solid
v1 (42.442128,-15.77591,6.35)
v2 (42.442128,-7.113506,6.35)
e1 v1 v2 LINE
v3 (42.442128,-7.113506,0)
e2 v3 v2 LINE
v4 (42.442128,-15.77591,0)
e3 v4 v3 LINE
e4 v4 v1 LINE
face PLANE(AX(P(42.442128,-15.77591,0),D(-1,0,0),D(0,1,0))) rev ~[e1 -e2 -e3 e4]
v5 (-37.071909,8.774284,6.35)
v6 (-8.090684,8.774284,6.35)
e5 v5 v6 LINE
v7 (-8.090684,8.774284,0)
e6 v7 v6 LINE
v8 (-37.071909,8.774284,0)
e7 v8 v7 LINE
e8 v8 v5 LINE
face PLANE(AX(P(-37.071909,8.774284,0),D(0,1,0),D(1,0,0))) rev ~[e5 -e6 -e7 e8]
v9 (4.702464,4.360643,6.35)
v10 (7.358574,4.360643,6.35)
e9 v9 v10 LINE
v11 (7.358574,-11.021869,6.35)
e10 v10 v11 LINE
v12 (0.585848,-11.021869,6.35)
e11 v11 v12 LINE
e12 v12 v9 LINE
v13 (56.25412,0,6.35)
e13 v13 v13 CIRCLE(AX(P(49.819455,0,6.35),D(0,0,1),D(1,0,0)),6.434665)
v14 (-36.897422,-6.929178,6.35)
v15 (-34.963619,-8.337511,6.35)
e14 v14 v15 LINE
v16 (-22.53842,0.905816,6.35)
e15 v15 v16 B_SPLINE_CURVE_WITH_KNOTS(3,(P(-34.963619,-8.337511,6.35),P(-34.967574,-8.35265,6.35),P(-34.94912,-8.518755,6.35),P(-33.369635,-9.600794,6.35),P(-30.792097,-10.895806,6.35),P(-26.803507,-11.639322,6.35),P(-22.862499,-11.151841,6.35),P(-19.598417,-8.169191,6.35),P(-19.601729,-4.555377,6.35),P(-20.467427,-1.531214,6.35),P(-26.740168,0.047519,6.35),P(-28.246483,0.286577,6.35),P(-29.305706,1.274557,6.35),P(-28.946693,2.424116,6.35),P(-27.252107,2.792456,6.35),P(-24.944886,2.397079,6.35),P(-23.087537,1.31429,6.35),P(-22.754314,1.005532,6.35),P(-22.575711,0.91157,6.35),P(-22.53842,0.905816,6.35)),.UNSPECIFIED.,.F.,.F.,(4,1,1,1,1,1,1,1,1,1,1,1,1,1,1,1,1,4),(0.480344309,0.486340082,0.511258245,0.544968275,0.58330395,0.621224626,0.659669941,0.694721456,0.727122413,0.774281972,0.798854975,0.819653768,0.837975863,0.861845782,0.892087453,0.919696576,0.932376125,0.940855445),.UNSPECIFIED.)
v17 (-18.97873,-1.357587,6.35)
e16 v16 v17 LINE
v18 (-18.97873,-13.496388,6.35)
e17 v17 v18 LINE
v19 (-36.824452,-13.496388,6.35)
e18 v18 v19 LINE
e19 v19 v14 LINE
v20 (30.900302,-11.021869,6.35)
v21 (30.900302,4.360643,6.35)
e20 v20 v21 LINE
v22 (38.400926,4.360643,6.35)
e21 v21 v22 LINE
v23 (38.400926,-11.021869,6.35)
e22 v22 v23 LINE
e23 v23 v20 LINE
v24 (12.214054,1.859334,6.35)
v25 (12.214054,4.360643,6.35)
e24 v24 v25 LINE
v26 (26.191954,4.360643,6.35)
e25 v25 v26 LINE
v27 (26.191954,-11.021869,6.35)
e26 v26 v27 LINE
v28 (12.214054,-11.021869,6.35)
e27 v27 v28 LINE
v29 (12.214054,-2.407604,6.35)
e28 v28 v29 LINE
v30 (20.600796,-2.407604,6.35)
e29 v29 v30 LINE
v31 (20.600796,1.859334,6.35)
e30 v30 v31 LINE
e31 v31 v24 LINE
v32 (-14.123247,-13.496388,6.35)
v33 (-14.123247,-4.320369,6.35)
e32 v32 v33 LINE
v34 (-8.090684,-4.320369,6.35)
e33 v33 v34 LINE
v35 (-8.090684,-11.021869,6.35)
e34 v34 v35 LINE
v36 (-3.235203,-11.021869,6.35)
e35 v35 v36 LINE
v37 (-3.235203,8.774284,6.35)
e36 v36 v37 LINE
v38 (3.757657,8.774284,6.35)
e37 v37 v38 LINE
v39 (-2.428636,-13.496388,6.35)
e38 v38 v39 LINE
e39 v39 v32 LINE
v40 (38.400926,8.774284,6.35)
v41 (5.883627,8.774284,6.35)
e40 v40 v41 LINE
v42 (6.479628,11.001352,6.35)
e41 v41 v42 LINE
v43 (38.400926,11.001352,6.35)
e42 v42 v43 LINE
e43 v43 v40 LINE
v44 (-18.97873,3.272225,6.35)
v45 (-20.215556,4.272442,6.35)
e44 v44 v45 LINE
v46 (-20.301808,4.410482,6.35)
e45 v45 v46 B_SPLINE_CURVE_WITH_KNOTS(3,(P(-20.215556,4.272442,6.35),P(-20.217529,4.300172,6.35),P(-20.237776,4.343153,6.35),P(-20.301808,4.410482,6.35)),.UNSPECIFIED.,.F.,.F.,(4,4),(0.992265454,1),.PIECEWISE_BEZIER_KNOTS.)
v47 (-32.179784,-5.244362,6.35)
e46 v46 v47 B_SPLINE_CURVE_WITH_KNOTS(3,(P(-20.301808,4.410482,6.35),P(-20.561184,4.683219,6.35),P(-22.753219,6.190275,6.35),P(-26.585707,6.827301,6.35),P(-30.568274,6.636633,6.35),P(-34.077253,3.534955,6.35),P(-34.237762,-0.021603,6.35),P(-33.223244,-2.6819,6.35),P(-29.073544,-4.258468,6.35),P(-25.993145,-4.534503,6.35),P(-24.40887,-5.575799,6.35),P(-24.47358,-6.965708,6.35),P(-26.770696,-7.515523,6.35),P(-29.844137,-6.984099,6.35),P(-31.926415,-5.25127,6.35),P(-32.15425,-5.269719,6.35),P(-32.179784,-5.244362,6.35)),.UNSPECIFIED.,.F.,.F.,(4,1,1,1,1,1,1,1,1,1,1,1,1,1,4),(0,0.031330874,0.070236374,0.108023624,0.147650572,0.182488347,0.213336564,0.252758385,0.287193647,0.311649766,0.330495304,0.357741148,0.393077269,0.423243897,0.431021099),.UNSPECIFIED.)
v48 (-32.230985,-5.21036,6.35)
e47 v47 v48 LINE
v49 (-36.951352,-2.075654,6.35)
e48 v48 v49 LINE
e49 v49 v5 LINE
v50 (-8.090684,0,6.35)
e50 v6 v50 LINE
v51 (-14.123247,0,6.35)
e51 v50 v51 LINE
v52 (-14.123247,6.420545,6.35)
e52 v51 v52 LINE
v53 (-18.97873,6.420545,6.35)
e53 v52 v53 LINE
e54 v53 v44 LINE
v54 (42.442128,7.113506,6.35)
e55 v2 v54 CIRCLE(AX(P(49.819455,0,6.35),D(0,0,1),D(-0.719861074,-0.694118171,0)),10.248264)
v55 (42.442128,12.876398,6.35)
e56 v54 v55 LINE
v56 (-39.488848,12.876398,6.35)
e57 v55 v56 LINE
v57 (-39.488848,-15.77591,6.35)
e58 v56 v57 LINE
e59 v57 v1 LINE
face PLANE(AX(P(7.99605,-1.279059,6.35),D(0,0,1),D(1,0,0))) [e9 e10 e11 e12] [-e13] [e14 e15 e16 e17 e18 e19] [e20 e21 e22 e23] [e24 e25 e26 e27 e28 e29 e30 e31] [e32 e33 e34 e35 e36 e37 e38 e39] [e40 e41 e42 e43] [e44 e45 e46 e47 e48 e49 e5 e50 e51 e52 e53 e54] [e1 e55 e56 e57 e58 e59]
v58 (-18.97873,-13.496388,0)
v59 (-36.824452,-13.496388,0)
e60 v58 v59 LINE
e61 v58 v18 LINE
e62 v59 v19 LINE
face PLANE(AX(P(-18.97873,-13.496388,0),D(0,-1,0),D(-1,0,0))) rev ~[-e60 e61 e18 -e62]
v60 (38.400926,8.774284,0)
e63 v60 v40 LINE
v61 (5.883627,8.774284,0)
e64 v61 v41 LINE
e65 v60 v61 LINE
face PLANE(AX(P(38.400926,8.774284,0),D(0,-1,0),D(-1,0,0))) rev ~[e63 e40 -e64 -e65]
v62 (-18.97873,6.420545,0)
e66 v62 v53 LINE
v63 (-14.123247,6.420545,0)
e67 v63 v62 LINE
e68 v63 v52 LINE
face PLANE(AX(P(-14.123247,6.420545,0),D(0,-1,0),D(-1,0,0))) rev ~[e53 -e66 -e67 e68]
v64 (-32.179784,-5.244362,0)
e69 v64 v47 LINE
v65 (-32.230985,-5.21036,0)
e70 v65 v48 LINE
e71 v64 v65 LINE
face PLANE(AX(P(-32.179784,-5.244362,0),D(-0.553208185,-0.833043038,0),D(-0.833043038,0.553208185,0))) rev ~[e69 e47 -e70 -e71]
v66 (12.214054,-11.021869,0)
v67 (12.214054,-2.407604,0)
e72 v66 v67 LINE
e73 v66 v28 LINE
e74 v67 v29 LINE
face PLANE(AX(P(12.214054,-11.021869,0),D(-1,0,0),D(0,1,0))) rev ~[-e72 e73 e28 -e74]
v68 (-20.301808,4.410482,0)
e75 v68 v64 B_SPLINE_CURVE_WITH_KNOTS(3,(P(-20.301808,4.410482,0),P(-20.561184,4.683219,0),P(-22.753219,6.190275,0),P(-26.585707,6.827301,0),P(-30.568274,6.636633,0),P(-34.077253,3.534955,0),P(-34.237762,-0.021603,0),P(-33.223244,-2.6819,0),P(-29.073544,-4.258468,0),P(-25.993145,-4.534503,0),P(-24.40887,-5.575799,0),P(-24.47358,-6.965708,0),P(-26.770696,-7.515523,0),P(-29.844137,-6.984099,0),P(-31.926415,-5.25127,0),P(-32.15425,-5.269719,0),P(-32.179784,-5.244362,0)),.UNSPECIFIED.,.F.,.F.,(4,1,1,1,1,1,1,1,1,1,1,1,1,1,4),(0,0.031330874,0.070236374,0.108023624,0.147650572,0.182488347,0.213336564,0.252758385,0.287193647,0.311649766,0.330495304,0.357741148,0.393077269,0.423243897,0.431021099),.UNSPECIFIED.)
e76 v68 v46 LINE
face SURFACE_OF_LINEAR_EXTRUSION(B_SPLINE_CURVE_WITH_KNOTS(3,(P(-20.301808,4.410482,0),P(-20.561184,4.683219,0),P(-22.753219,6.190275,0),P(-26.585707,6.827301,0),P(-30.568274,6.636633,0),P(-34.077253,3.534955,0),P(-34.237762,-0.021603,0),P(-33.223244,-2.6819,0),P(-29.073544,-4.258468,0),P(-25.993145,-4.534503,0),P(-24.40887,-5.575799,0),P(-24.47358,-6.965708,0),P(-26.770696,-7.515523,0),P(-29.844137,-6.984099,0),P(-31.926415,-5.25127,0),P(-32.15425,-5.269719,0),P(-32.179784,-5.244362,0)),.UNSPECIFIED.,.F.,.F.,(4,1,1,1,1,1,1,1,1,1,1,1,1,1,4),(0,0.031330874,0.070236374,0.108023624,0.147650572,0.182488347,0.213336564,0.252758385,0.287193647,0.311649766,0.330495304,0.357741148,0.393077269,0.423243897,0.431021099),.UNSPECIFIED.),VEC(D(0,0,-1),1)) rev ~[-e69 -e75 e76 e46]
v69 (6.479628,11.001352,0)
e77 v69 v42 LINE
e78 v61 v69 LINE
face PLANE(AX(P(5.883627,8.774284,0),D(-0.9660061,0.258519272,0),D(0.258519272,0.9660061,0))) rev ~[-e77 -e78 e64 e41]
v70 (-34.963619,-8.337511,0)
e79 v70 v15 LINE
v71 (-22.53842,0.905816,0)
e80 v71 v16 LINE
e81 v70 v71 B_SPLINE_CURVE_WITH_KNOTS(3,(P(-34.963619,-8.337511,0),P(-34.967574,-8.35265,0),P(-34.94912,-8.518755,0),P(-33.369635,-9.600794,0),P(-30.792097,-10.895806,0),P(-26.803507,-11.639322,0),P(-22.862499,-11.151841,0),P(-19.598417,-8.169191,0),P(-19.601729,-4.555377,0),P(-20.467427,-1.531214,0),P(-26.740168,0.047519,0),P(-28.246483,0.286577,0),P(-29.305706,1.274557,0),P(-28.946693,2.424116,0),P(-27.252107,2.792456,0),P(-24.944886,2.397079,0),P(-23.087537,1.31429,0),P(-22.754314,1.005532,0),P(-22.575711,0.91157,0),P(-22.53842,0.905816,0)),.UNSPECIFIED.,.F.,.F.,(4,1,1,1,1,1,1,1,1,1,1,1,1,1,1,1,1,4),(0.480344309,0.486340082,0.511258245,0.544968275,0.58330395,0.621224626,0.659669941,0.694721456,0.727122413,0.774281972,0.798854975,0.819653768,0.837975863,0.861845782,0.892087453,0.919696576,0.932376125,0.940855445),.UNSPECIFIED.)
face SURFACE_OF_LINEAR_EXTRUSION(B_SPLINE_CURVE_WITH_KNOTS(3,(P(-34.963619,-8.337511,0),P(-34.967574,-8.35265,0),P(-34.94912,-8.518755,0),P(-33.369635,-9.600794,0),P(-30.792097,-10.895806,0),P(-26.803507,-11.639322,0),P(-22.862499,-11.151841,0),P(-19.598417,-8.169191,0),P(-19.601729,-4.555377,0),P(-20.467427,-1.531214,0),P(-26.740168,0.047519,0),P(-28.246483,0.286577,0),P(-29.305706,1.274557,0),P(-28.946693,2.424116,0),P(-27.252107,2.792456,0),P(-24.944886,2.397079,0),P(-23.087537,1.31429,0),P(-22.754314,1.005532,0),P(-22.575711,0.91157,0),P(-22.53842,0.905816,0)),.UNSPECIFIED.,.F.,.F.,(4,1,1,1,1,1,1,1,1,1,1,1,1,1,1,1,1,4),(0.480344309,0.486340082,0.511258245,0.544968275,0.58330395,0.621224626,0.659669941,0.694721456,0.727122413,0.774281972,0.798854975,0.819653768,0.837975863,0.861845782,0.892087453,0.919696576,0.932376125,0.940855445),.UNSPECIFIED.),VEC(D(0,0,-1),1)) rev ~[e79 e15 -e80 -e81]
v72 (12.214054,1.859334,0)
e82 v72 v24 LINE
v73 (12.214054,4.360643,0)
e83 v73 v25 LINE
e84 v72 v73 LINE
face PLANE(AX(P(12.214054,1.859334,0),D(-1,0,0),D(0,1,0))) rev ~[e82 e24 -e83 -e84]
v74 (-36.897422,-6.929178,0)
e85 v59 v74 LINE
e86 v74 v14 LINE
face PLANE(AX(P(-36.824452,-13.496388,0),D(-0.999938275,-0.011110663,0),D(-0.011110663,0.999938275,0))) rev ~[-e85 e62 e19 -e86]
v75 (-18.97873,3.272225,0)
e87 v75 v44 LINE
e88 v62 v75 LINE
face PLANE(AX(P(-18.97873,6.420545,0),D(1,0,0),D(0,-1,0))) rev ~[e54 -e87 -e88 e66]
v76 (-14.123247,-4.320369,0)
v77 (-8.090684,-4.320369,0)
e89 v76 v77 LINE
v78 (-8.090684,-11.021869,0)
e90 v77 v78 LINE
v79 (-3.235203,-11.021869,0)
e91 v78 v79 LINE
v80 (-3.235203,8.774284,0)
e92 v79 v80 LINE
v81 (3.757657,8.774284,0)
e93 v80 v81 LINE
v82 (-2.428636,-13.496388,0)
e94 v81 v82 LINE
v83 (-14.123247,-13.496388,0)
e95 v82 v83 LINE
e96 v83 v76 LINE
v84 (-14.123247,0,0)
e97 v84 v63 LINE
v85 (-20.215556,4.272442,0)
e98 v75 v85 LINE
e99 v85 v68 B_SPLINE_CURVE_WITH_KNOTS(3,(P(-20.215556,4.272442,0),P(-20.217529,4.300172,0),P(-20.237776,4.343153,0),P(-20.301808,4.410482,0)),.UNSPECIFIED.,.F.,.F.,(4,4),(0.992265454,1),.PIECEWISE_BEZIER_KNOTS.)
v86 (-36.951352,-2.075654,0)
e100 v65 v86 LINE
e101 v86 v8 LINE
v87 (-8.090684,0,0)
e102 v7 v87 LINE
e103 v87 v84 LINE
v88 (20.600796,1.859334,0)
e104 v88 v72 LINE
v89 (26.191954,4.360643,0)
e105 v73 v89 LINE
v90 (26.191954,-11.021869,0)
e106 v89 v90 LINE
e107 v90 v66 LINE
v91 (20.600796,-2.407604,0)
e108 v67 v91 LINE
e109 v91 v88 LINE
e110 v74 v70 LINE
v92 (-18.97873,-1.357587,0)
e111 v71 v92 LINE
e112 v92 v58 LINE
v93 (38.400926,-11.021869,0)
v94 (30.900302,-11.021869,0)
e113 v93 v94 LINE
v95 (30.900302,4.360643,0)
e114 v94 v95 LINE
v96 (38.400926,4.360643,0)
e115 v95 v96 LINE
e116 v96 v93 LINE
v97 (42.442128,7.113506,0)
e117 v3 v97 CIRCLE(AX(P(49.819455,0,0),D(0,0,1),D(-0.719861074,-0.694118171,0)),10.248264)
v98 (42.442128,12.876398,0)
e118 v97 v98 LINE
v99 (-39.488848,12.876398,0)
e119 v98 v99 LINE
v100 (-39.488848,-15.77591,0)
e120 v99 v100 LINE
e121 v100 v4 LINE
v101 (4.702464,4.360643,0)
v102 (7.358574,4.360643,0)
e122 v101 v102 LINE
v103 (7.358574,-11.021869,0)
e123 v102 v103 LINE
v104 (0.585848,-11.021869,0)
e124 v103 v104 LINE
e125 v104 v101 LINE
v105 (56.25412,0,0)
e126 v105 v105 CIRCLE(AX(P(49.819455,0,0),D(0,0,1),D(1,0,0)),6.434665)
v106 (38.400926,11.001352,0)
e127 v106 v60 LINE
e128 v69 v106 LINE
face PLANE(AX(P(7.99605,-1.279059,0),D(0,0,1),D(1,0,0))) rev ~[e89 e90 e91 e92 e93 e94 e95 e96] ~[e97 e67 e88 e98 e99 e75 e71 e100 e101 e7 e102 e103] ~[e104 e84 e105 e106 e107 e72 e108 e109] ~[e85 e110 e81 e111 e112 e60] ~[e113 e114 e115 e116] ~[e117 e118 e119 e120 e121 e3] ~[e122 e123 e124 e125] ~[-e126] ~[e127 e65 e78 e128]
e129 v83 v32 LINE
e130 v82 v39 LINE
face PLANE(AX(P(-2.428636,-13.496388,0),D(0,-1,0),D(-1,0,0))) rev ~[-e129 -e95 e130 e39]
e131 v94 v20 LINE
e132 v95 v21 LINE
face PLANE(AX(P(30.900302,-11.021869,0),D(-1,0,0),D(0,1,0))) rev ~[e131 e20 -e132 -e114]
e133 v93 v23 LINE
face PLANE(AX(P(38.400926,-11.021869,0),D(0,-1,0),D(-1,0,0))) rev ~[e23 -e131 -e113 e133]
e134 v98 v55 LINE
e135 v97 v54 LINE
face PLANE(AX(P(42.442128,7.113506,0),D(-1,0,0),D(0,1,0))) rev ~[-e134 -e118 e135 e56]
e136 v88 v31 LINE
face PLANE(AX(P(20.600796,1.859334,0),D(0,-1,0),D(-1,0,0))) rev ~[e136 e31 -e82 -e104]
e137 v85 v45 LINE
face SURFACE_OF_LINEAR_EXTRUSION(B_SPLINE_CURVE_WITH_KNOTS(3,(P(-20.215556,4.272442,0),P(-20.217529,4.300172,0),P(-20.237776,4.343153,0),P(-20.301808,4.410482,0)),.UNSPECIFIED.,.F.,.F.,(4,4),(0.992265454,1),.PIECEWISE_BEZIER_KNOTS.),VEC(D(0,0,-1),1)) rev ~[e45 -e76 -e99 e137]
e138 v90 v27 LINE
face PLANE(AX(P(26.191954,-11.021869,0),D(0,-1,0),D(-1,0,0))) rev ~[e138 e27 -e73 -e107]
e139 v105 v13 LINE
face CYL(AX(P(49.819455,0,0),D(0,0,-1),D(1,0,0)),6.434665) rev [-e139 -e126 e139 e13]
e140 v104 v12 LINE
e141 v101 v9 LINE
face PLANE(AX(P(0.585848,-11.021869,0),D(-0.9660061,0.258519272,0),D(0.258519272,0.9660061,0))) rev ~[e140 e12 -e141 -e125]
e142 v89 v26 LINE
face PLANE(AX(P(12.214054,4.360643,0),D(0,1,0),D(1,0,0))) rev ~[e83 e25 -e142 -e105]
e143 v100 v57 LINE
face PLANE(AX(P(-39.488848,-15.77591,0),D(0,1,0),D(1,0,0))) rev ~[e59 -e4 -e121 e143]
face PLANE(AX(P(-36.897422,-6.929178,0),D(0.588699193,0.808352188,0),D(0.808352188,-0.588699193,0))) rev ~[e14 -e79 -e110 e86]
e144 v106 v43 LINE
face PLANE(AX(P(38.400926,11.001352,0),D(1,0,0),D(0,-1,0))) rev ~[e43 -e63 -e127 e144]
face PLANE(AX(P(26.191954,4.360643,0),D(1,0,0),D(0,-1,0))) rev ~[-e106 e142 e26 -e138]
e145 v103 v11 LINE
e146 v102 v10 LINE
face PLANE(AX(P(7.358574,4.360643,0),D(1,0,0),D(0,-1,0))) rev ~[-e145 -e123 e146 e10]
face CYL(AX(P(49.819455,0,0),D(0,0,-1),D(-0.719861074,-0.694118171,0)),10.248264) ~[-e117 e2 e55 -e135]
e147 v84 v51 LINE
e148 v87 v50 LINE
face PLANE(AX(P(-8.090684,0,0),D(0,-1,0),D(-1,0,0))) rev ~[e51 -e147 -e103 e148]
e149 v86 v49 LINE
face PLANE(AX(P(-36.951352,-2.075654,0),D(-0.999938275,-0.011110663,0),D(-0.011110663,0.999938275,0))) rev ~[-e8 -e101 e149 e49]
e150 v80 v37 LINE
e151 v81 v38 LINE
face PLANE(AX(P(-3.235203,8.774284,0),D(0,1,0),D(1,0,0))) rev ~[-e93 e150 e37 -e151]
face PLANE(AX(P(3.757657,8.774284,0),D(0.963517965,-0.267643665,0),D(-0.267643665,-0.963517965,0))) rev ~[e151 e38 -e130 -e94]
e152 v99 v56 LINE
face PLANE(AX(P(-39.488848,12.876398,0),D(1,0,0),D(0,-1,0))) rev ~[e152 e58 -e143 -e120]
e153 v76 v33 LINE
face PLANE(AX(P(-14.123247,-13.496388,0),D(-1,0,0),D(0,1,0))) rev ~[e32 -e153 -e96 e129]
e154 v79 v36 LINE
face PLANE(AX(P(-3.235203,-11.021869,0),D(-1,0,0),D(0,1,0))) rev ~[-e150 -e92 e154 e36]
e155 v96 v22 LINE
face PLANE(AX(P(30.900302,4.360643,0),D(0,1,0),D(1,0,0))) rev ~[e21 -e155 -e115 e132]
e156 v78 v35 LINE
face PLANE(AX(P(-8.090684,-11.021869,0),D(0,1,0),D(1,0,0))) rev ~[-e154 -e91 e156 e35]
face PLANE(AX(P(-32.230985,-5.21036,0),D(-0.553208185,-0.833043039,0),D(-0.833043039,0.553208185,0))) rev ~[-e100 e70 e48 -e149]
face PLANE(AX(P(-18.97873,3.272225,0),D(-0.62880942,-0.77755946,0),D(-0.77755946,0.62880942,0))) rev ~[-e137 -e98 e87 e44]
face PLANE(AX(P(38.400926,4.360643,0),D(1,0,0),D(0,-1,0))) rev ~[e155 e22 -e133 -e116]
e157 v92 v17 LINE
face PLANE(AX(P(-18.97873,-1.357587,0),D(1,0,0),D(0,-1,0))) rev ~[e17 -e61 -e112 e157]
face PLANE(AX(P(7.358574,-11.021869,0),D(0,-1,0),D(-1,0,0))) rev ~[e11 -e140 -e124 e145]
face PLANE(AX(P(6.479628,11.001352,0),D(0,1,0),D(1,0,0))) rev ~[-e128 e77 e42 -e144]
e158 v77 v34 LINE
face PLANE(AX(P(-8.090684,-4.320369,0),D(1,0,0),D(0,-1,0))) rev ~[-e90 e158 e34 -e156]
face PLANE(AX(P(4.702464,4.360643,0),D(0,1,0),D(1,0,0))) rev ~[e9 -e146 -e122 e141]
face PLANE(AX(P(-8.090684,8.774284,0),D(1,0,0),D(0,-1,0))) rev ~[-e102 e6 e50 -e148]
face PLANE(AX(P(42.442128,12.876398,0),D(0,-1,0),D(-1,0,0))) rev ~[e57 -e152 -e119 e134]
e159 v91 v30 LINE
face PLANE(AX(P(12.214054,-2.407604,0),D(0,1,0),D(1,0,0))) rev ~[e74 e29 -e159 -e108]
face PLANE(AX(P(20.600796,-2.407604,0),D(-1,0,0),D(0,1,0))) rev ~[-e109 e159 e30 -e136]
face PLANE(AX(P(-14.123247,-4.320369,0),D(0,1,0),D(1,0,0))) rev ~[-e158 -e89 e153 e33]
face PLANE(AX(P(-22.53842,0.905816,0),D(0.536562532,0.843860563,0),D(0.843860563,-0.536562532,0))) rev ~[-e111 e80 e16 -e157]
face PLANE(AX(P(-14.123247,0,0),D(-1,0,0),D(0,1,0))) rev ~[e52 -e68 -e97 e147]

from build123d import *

# Parameters (mm, degrees)
F0_R     = 6.4346653904
F1_DEPTH = 6.35


with BuildPart() as f1:
    # F0 (on Top) → F1 (new body)
    with BuildSketch(Plane.XY):
        with BuildLine():
            Line((42.4421280622, 12.8763979301), (39.4888482988, 12.8763979301))
            Line((39.4888482988, 12.8763979301), (-39.4888482988, 12.8763979301))
            Line((-39.4888482988, 12.8763979301), (-39.4888482988, -12.8763979301))
            Line((-39.4888482988, -12.8763979301), (-39.4888482988, -15.7759096473))
            Line((-39.4888482988, -15.7759096473), (42.4421280622, -15.7759096473))
            Line((42.4421280622, -15.7759096473), (42.4421280622, -7.1135064169))
            ThreePointArc((42.4421280622, -7.1135064169), (60.0677187775, 0), (42.4421280622, 7.1135064169))
            Line((42.4421280622, 7.1135064169), (42.4421280622, 12.8763979301))
        make_face()
        with BuildLine():
            Line((-36.9513516024, -2.0756540524), (-37.0719090537, 8.7742841496))
            Line((-37.0719090537, 8.7742841496), (-8.0906844199, 8.7742841496))
            Line((-8.0906844199, 8.7742841496), (-8.0906844199, 6.4205448143))
            Line((-8.0906844199, 6.4205448143), (-8.0906844199, 0))
            Line((-8.0906844199, 0), (-14.1232470879, 0))
            Line((-14.1232470879, 0), (-14.1232470879, 6.4205448143))
            Line((-14.1232470879, 6.4205448143), (-18.9787298441, 6.4205448143))
            Line((-18.9787298441, 6.4205448143), (-18.9787298441, 3.272225149))
            Line((-18.9787298441, 3.272225149), (-20.2155560255, 4.2724418454))
            add(Edge.make_bspline(
                [(-22.5384198129, 0.9058159776), (-22.5087632242, 0.9012403563), (-22.4564231627, 1.003636113), (-20.2998909345, 4.1680794182), (-20.2137324503, 4.2468094283), (-20.2155560255, 4.2724418454)],
                knots=[0.9408554446, 0.9408554446, 0.9408554446, 0.9408554446, 0.9475987771, 0.9851160131, 0.9922654541, 0.9922654541, 0.9922654541, 0.9922654541], degree=3))
            Line((-22.5384198129, 0.9058159776), (-18.9787298441, -1.3575867051))
            Line((-18.9787298441, -1.3575867051), (-18.9787298441, -11.0218683258))
            Line((-18.9787298441, -11.0218683258), (-18.9787298441, -13.4963878203))
            Line((-18.9787298441, -13.4963878203), (-36.8244518423, -13.4963878203))
            Line((-36.8244518423, -13.4963878203), (-36.8974223987, -6.9291784173))
            Line((-36.8974223987, -6.9291784173), (-34.963618964, -8.3375107497))
            add(Edge.make_bspline(
                [(-32.2309853918, -5.2103603082), (-32.2342536022, -5.2109736525), (-32.5026233072, -5.2870456733), (-34.8780387985, -8.3306569491), (-34.9598781788, -8.3231927663), (-34.963618964, -8.3375107497)],
                knots=[0.4355467782, 0.4355467782, 0.4355467782, 0.4355467782, 0.4360630295, 0.4746738617, 0.4803443093, 0.4803443093, 0.4803443093, 0.4803443093], degree=3))
            Line((-32.2309853918, -5.2103603082), (-36.9513516024, -2.0756540524))
        make_face(mode=Mode.SUBTRACT)
        Polygon((-3.2352029779, 8.7742841496), (3.757656788, 8.7742841496), (-2.4286360377, -13.4963878203), (-14.1232470879, -13.4963878203), (-14.1232470879, -11.0218693809), (-14.1232470879, -4.3203692259), (-8.0906844199, -4.3203692259), (-8.0906844199, -11.0218693809), (-3.2352029779, -11.0218693809), (-3.2352029779, 6.4205437592), align=None, mode=Mode.SUBTRACT)
        Polygon((7.3585736133, -11.0218693809), (0.585847945, -11.0218693809), (4.7024635713, 4.360642626), (7.3585736133, 4.360642626), (7.3585736133, -8.7344424174), align=None, mode=Mode.SUBTRACT)
        Polygon((26.1919542714, 4.360642626), (26.1919542714, -8.7344424174), (26.1919542714, -11.0218693809), (12.214054124, -11.0218693809), (12.214054124, -8.7344424174), (12.214054124, -2.4076042538), (20.6007964476, -2.4076042538), (20.6007964476, 1.8593341737), (12.214054124, 1.8593341737), (12.214054124, 4.360642626), align=None, mode=Mode.SUBTRACT)
        Polygon((38.4009263977, 4.360642626), (38.4009263977, -11.0218693809), (30.9003021135, -11.0218693809), (30.9003021135, -8.7344424174), (30.9003021135, 4.360642626), (36.1971899434, 4.360642626), align=None, mode=Mode.SUBTRACT)
        with Locations((49.8194545507, 0)):
            Circle(F0_R, mode=Mode.SUBTRACT)
        Polygon((5.8836273277, 8.7742841496), (6.4796276889, 11.001352097), (38.4009263977, 11.001352097), (38.4009263977, 8.7742841496), (36.1971899434, 8.7742841496), (7.3585736133, 8.7742841496), align=None, mode=Mode.SUBTRACT)
        with BuildLine():
            Line((-32.1797840297, -5.244362168), (-32.2309853918, -5.2103603082))
            add(Edge.make_bspline(
                [(-32.2309853918, -5.2103603082), (-32.2342536022, -5.2109736525), (-32.5026233072, -5.2870456733), (-34.8780387985, -8.3306569491), (-34.9598781788, -8.3231927663), (-34.963618964, -8.3375107497)],
                knots=[0.4355467782, 0.4355467782, 0.4355467782, 0.4355467782, 0.4360630295, 0.4746738617, 0.4803443093, 0.4803443093, 0.4803443093, 0.4803443093], degree=3))
            add(Edge.make_bspline(
                [(-34.963618964, -8.3375107497), (-34.9675743656, -8.3526501853), (-34.94912, -8.5187549568), (-33.3696351013, -9.6007944416), (-30.7920969463, -10.8958063848), (-26.8035065017, -11.6393224595), (-22.862499267, -11.1518414802), (-19.5984169566, -8.1691908864), (-19.6017291407, -4.5553773395), (-20.4674273936, -1.5312135148), (-26.7401677603, 0.0475188317), (-28.2464831836, 0.2865770189), (-29.3057058095, 1.2745574964), (-28.9466933204, 2.4241158437), (-27.2521069685, 2.7924557318), (-24.9448859469, 2.3970789833), (-23.0875367983, 1.3142896199), (-22.7543139439, 1.0055321165), (-22.5757111205, 0.9115695355), (-22.5384198129, 0.9058159776)],
                knots=[0.4803443093, 0.4803443093, 0.4803443093, 0.4803443093, 0.4863400822, 0.5112582455, 0.5449682746, 0.5833039505, 0.6212246257, 0.6596699414, 0.6947214559, 0.727122413, 0.774281972, 0.7988549754, 0.8196537682, 0.8379758627, 0.8618457815, 0.8920874529, 0.9196965763, 0.9323761252, 0.9408554446, 0.9408554446, 0.9408554446, 0.9408554446], degree=3))
            add(Edge.make_bspline(
                [(-22.5384198129, 0.9058159776), (-22.5087632242, 0.9012403563), (-22.4564231627, 1.003636113), (-20.2998909345, 4.1680794182), (-20.2137324503, 4.2468094283), (-20.2155560255, 4.2724418454)],
                knots=[0.9408554446, 0.9408554446, 0.9408554446, 0.9408554446, 0.9475987771, 0.9851160131, 0.9922654541, 0.9922654541, 0.9922654541, 0.9922654541], degree=3))
            add(Edge.make_bspline(
                [(-20.2155560255, 4.2724418454), (-20.2175288408, 4.3001720003), (-20.2377762384, 4.3431530092), (-20.3018076718, 4.4104824774)],
                knots=[0.9922654541, 0.9922654541, 0.9922654541, 0.9922654541, 1, 1, 1, 1], degree=3))
            add(Edge.make_bspline(
                [(-20.3018076718, 4.4104824774), (-20.5611843452, 4.6832187345), (-22.7532194208, 6.1902747016), (-26.5857065373, 6.8273013596), (-30.5682744913, 6.6366330017), (-34.0772532991, 3.5349548203), (-34.2377624912, -0.0216028843), (-33.2232441235, -2.6818995712), (-29.0735436506, -4.2584680685), (-25.9931449346, -4.5345033939), (-24.4088698097, -5.5757988745), (-24.4735796107, -6.9657080374), (-26.77069563, -7.515523238), (-29.8441369576, -6.9840985647), (-31.926415002, -5.2512697169), (-32.1542497767, -5.2697193823), (-32.1797840297, -5.244362168)],
                knots=[0, 0, 0, 0, 0.0313308742, 0.0702363738, 0.108023624, 0.1476505721, 0.1824883473, 0.2133365645, 0.2527583853, 0.2871936467, 0.3116497664, 0.3304953042, 0.3577411479, 0.3930772692, 0.4232438974, 0.4310210993, 0.4310210993, 0.4310210993, 0.4310210993], degree=3))
        make_face()
    extrude(amount=F1_DEPTH)


solid = f1.part
